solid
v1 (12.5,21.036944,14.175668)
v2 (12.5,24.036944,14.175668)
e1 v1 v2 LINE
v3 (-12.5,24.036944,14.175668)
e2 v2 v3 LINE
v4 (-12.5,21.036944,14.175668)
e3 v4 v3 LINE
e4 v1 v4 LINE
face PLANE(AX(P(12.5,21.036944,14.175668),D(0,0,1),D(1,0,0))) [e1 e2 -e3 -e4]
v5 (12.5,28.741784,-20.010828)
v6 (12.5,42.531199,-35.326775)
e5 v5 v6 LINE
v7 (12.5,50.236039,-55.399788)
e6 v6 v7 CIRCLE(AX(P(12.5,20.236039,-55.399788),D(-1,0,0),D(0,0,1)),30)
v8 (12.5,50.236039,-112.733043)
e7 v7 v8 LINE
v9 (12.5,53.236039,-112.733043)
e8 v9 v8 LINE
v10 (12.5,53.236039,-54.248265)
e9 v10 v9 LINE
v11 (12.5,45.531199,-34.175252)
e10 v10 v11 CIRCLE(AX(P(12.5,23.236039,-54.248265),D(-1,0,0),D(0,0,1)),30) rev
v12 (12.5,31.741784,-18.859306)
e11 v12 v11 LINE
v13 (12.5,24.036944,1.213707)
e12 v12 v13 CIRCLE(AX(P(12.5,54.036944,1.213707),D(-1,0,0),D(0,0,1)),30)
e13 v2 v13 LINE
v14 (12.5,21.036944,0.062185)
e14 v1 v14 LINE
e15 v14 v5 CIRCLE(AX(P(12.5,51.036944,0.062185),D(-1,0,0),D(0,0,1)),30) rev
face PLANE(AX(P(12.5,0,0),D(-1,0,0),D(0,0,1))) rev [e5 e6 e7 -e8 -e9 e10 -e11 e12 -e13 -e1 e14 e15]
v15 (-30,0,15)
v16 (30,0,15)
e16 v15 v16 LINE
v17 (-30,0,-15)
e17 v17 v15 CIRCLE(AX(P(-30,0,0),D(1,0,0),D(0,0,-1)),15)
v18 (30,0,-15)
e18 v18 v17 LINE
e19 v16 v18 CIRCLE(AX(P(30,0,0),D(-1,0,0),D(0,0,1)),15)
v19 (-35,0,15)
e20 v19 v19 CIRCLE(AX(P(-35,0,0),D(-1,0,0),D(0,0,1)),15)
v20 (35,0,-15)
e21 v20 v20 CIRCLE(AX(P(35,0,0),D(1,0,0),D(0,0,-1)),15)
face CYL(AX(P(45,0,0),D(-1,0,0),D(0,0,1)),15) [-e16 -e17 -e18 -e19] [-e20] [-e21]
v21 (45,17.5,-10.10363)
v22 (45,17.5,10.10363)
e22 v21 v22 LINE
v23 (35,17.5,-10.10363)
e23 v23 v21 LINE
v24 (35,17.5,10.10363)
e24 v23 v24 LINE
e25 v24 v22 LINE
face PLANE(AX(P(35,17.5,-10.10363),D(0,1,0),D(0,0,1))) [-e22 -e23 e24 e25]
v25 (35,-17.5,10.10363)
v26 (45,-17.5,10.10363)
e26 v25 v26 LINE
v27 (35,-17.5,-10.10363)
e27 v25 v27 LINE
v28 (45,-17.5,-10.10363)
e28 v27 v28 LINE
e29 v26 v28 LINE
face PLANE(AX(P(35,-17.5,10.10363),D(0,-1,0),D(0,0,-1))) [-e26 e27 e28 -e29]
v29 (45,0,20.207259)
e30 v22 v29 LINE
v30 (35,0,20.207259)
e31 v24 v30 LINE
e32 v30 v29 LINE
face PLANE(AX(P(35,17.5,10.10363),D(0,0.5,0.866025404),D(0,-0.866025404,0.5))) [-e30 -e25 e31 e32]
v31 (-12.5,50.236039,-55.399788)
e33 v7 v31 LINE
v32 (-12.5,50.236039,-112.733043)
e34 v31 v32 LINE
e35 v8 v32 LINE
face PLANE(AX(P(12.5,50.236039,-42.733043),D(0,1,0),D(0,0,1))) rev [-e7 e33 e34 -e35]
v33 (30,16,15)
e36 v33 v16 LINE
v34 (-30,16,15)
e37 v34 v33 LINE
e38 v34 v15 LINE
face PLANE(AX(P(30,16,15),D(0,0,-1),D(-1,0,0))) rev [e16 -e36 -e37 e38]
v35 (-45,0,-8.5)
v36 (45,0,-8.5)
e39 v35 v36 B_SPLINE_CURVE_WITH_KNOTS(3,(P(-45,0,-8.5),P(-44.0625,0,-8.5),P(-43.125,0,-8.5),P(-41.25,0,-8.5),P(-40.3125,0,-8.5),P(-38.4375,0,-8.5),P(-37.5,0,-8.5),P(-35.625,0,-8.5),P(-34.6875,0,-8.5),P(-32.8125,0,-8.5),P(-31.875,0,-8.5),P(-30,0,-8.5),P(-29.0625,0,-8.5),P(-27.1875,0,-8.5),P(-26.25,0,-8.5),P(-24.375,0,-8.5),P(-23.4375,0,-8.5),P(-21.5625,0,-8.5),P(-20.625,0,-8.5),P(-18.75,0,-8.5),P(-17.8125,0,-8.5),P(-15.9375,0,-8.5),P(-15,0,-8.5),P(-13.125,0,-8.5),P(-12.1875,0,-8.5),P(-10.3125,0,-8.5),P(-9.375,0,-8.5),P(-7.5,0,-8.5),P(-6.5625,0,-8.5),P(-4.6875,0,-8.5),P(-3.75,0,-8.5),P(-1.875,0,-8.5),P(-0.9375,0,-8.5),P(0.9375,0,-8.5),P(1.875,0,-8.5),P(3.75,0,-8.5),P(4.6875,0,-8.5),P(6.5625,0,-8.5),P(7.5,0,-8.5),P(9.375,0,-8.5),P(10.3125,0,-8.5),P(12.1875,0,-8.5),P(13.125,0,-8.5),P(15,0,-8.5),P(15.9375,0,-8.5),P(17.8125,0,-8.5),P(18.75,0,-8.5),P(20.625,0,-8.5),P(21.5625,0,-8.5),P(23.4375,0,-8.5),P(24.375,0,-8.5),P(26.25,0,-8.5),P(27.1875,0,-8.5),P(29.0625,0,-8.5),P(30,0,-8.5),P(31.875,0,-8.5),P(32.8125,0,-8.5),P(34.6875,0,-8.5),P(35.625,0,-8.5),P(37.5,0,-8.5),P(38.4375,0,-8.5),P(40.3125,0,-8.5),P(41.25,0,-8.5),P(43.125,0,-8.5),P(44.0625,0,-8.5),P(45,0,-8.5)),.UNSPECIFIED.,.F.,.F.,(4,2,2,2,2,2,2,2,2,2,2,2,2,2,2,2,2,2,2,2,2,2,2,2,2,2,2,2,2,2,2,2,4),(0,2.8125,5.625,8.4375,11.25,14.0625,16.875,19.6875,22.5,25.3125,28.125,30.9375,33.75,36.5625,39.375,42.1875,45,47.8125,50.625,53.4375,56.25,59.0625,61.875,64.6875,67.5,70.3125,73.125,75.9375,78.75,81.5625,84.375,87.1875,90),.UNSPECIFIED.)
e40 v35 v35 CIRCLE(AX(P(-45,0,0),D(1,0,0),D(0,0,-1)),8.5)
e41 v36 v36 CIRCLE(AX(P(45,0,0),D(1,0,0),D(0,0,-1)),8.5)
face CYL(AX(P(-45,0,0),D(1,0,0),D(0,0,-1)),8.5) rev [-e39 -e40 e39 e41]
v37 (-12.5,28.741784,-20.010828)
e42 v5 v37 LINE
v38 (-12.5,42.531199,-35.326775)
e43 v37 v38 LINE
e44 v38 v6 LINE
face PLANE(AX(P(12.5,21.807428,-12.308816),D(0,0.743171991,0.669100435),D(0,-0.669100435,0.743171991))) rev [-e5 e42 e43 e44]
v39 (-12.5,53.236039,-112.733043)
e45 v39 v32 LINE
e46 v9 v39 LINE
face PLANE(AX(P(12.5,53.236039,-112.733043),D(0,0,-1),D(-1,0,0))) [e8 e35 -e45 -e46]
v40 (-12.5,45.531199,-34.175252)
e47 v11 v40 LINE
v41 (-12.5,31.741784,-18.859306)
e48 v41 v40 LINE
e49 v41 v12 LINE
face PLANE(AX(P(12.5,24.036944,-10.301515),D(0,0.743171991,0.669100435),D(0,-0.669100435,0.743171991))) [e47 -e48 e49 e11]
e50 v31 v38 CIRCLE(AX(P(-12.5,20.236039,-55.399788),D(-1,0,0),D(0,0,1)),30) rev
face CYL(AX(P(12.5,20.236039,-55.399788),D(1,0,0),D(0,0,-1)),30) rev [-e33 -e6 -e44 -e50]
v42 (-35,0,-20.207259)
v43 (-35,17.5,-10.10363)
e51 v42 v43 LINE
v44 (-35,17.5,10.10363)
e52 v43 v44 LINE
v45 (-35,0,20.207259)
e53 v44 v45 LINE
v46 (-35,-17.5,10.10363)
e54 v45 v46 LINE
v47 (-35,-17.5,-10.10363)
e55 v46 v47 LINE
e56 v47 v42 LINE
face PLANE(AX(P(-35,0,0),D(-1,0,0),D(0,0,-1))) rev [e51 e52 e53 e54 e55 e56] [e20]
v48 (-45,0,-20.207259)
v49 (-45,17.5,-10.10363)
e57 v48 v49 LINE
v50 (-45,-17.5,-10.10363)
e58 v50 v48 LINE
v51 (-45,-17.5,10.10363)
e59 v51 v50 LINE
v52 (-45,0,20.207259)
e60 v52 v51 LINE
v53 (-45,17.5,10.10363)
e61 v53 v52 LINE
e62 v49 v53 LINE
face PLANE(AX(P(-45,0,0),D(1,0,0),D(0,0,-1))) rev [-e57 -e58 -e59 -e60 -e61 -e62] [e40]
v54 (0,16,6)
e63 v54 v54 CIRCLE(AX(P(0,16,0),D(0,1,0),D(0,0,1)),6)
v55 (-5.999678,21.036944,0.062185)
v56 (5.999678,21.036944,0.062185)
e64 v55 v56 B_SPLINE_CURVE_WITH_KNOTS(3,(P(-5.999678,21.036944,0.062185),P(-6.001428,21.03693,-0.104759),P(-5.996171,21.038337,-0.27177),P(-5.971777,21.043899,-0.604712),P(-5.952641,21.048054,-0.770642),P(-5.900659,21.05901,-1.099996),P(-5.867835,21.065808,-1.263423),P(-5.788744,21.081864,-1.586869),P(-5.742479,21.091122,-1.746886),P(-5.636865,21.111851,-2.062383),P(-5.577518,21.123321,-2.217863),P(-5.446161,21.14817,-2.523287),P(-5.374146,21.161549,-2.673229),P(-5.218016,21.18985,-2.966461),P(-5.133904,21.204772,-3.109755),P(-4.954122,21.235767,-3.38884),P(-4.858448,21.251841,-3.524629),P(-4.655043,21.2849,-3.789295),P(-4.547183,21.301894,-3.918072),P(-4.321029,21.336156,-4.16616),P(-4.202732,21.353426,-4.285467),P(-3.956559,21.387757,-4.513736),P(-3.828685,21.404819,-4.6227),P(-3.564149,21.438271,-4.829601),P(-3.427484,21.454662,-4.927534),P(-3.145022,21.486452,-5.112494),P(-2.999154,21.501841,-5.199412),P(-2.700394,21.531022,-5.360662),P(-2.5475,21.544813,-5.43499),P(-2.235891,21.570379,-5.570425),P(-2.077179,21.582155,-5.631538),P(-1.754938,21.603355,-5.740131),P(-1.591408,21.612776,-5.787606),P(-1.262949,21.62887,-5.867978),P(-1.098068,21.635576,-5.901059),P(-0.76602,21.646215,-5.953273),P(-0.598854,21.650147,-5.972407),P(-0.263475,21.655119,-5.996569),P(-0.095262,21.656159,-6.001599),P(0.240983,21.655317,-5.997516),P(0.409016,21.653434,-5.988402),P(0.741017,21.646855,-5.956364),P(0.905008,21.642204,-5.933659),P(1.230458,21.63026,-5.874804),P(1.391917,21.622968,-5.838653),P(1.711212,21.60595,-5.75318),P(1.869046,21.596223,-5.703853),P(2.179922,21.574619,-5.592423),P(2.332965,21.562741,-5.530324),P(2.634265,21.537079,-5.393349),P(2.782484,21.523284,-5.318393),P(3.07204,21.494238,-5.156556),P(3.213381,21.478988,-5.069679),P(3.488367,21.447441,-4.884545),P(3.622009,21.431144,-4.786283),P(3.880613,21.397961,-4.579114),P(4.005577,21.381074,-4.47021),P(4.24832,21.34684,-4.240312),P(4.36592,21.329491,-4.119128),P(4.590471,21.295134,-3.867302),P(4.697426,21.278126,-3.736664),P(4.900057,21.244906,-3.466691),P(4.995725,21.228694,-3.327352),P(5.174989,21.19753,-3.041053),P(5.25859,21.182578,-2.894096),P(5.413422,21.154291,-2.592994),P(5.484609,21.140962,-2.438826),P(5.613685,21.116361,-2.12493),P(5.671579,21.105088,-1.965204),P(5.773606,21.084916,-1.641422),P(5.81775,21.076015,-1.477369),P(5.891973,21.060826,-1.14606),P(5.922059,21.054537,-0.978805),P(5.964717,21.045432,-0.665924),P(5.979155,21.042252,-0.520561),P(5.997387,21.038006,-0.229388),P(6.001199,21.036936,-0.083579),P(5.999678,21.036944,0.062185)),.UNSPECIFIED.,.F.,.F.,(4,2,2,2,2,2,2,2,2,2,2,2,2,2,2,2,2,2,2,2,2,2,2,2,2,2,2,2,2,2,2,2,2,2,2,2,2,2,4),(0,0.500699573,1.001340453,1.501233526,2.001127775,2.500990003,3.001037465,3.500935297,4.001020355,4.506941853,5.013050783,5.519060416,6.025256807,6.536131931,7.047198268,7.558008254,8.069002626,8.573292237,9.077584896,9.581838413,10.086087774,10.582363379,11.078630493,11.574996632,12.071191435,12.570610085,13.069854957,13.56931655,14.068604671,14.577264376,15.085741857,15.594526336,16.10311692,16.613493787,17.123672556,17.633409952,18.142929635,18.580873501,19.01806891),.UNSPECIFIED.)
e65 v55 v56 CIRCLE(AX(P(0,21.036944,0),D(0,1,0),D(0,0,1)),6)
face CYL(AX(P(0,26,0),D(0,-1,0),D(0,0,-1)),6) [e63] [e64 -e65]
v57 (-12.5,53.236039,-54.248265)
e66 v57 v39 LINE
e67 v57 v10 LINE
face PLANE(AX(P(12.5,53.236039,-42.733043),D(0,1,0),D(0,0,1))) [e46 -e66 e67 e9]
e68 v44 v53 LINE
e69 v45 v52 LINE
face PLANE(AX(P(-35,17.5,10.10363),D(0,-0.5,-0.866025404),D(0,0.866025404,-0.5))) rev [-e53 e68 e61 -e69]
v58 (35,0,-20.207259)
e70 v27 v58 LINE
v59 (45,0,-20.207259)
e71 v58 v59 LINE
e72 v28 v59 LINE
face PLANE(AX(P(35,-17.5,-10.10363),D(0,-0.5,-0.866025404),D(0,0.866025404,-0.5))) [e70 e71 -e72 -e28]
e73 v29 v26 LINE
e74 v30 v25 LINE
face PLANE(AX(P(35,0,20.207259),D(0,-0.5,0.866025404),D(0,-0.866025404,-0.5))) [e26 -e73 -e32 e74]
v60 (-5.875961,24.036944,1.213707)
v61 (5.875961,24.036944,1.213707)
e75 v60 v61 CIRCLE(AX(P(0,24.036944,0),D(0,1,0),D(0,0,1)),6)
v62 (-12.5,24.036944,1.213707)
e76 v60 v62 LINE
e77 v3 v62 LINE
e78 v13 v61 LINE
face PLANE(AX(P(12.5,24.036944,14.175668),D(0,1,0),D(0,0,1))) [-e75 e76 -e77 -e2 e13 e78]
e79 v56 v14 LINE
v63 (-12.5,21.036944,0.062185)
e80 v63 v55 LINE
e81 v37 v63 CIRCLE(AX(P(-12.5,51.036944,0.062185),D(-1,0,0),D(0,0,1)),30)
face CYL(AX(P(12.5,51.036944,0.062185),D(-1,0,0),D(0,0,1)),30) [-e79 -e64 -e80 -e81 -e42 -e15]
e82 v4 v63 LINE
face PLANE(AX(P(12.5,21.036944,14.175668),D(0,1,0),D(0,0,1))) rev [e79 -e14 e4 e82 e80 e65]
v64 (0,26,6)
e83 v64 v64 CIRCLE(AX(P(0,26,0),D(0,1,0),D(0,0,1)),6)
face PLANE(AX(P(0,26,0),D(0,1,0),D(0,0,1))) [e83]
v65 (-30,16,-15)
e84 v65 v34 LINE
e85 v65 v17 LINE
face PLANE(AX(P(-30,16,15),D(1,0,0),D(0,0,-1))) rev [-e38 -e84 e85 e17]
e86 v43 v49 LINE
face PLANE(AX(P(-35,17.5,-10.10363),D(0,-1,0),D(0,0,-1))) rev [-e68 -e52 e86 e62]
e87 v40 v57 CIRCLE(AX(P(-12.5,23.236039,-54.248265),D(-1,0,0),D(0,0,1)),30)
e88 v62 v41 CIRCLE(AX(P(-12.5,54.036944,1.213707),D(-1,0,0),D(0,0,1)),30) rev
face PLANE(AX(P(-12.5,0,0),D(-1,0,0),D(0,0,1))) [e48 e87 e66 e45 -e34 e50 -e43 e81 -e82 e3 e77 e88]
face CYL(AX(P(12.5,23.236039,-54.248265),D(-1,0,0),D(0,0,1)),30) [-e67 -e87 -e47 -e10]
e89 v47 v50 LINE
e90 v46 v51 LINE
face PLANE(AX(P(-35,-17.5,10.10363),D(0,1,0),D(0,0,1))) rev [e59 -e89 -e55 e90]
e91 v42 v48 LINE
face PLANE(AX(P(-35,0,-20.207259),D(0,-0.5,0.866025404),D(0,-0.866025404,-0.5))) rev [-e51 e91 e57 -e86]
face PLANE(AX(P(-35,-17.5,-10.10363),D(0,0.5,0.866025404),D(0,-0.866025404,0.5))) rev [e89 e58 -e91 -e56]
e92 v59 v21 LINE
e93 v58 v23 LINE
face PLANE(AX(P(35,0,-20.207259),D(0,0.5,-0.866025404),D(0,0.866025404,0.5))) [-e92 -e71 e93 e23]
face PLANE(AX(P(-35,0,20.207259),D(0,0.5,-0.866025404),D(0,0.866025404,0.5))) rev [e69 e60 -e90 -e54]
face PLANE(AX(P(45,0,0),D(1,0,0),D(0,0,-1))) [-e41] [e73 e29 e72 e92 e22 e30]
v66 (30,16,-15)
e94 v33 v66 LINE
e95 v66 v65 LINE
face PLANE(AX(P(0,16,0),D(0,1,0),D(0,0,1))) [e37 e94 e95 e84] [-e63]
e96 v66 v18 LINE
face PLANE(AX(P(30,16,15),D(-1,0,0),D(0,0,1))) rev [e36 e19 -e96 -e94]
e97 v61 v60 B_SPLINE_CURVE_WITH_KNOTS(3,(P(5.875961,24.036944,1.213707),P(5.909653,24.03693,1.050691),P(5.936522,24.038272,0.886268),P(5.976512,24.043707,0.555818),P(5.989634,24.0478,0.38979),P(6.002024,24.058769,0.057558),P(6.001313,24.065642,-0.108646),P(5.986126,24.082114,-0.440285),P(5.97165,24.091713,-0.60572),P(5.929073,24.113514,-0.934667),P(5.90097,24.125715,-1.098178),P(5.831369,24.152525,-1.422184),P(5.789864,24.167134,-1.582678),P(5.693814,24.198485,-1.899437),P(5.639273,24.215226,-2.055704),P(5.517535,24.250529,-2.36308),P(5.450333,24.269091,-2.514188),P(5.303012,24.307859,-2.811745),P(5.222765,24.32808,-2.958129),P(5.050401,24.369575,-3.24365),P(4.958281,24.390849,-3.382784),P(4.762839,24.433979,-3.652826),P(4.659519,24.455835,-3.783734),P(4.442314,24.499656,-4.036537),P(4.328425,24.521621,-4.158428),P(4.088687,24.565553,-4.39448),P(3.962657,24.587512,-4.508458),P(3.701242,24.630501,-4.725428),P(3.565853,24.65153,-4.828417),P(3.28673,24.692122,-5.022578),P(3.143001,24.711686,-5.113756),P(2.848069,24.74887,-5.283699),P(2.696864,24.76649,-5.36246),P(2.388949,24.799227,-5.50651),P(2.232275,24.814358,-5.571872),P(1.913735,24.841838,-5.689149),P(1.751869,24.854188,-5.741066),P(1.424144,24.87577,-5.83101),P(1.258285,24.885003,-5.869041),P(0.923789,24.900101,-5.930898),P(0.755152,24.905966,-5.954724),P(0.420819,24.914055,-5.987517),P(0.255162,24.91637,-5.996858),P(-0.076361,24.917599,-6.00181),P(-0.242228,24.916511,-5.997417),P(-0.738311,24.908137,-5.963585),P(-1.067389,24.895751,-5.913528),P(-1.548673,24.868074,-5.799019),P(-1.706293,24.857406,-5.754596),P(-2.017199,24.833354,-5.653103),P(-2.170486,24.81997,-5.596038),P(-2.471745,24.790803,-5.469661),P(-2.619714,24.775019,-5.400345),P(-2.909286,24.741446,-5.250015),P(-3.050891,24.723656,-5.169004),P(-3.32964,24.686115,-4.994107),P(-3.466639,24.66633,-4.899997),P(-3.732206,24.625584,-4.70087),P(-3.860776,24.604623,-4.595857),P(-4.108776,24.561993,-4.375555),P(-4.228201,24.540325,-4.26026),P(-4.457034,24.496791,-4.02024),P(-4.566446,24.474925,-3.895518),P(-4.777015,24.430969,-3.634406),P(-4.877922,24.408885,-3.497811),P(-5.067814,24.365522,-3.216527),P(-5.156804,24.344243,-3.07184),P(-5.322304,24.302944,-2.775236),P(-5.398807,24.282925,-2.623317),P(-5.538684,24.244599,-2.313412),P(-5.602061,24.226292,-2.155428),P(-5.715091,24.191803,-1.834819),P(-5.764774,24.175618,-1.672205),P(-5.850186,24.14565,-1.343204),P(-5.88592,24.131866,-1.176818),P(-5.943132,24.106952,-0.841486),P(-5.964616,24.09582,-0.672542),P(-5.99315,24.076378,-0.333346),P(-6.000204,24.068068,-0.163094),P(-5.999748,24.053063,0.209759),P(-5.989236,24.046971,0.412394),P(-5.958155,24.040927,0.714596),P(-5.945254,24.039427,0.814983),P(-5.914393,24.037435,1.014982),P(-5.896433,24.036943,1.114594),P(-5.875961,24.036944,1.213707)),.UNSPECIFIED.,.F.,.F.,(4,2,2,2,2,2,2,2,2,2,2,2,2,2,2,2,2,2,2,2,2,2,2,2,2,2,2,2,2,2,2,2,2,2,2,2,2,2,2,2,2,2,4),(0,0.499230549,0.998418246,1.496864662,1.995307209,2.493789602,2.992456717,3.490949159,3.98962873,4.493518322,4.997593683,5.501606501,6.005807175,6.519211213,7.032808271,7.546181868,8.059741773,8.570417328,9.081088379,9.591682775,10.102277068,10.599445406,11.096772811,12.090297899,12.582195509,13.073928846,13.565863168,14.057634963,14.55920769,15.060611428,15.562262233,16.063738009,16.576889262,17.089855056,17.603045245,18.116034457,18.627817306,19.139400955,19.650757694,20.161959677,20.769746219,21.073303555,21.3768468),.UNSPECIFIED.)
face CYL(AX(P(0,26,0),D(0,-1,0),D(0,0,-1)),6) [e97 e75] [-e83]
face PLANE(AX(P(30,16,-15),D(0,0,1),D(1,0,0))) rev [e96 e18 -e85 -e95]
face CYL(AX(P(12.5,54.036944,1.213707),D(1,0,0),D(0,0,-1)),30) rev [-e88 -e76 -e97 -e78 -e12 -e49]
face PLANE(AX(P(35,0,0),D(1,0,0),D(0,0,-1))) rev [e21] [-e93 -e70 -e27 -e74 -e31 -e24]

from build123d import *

# Parameters (mm, degrees)
SKETCH1_R               = 15
SKETCH1_R_2             = 5
EXTRUDE_THIN1_DEPTH     = 45
SKETCH2_W               = 60
SKETCH2_H               = 30
BOSS_EXTRUDE1_DEPTH     = 16
SKETCH3_R               = 6
BOSS_EXTRUDE2_DEPTH     = 10
EXTRUDE_THIN2_DEPTH     = 12.5
FILLET1_R               = 30
BOSS_EXTRUDE3_DEPTH     = 10
CUT_EXTRUDE1_DEPTH      = 133.543633763
CUT_EXTRUDE1_DEPTH_BACK = 133.543633763
SKETCH6_R               = 8.5


with BuildPart() as part:
    # Sketch1 → Extrude-Thin1 (new, symmetric)
    with BuildSketch(Plane(origin=(0, 0, 0), x_dir=(0, 0, -1), z_dir=(1, 0, 0))):
        Circle(SKETCH1_R)
        Circle(SKETCH1_R_2, mode=Mode.SUBTRACT)
    extrude(amount=EXTRUDE_THIN1_DEPTH, both=True)

    # Sketch2 → Boss-Extrude1 (add)
    with BuildSketch(Plane(origin=(0, 0, 0), x_dir=(1, 0, 0), z_dir=(0, 1, 0))):
        Rectangle(SKETCH2_W, SKETCH2_H)
    extrude(amount=BOSS_EXTRUDE1_DEPTH)

    # Sketch3 → Boss-Extrude2 (add)
    with BuildSketch(Plane(origin=(0, 16, 0), x_dir=(1, 0, 0), z_dir=(0, 1, 0))):
        with Locations(Location((0, 0, 0), (0, 0, 270))):
            Circle(SKETCH3_R)
    extrude(amount=BOSS_EXTRUDE2_DEPTH)

    # Sketch4 → Extrude-Thin2 (add, symmetric)
    with BuildSketch(Plane(origin=(0, 0, 0), x_dir=(0, 0, -1), z_dir=(1, 0, 0))):
        Polygon((-14.175668382, 24.036944014), (10.301514998, 24.036944014), (42.733043078, 53.23603901), (112.733043078, 53.23603901), (112.733043078, 50.23603901), (43.884565313, 50.23603901), (11.453037232, 21.036944014), (-14.175668382, 21.036944014), align=None)
    extrude(amount=EXTRUDE_THIN2_DEPTH, both=True)

    # Fillet1
    # the kernel refuses this fillet: 30 mm, written as the material it adds along each edge
    with BuildSketch(Plane(origin=(12.5, 50.23603901, -43.884565313), x_dir=(0, -0.6691004351822666, 0.7431719906178524), z_dir=(-1, 0, 0))) as fillet1_piece_1:
        with BuildLine():
            CenterArc((FILLET1_R * 0.383840744794, -FILLET1_R), FILLET1_R, 90, 41.997673873)
            Line((-FILLET1_R * 0.285259690389, -FILLET1_R * 0.256828009382), (0, 0))
            Line((0, 0), (FILLET1_R * 0.383840744794, 0))
        make_face()
    extrude(amount=25)
    with BuildSketch(Plane(origin=(12.5, 24.036944014, -10.301514998), x_dir=(0, 0, 1), z_dir=(-1, 0, 0))) as fillet1_piece_2:
        with BuildLine():
            CenterArc((FILLET1_R * 0.383840744794, FILLET1_R), FILLET1_R, 228.002326127, 41.997673873)
            Line((-FILLET1_R * 0.285259690389, FILLET1_R * 0.256828009382), (0, 0))
            Line((0, 0), (FILLET1_R * 0.383840744794, 0))
        make_face()
    extrude(amount=25)
    # the kernel refuses this fillet: 30 mm, written as the material it takes off along each edge
    with BuildSketch(Plane(origin=(41.28805586, 53.23603901, -42.733043078), x_dir=(0, -0.6691004351822663, 0.7431719906178528), z_dir=(-1, 0, 0))) as fillet1_2_piece_1:
        with BuildLine():
            CenterArc((FILLET1_R * 0.383840744794, -FILLET1_R), FILLET1_R, 90, 41.997673873)
            Line((-FILLET1_R * 0.285259690389, -FILLET1_R * 0.256828009382), (0, 0))
            Line((0, 0), (FILLET1_R * 0.383840744794, 0))
        make_face()
    extrude(amount=82.576111719, mode=Mode.SUBTRACT)
    with BuildSketch(Plane(origin=(-41.28805586, 21.036944014, -11.453037232), x_dir=(0, 0, 1), z_dir=(1, 0, 0))) as fillet1_2_piece_2_section:
        with BuildLine():
            CenterArc((FILLET1_R * 0.383840744794, -FILLET1_R), FILLET1_R, 90, 41.997673873)
            Line((-FILLET1_R * 0.285259690389, -FILLET1_R * 0.256828009382), (0, 0))
            Line((0, 0), (FILLET1_R * 0.383840744794, 0))
        make_face()
    fillet1_2_piece_2 = extrude(amount=82.576111719, mode=Mode.PRIVATE)
    fillet1_2_piece_2 = fillet1_2_piece_2 - Plane(origin=(0, 22.678661346, 0), x_dir=(0, 0, 1), z_dir=(0, -1, 0)) * Cylinder(6, 212, mode=Mode.PRIVATE)
    add(fillet1_2_piece_2, mode=Mode.SUBTRACT)

    # Sketch5 → Boss-Extrude3 (add)
    with BuildSketch(Plane(origin=(45, 0, 0), x_dir=(0, 0, -1), z_dir=(1, 0, 0))):
        Polygon((-20.207259422, 0), (-10.103629711, -17.5), (10.103629711, -17.5), (20.207259422, 0), (10.103629711, 17.5), (-10.103629711, 17.5), align=None)
    boss_extrude3 = extrude(amount=-BOSS_EXTRUDE3_DEPTH)

    # Mirror1: Boss-Extrude3 across plane
    add(boss_extrude3.mirror(Plane(origin=(0, 0, 0), x_dir=(0, 0, 1), z_dir=(1, 0, 0))))

    # Sketch6 → Cut-Extrude1 (cut, two sides: drawn at the far end of the back side and taken through both)
    with BuildSketch(Plane(origin=(0, 0, 0), x_dir=(0, 0, -1), z_dir=(1, 0, 0)).offset(-CUT_EXTRUDE1_DEPTH_BACK)):
        Circle(SKETCH6_R)
    extrude(amount=CUT_EXTRUDE1_DEPTH + CUT_EXTRUDE1_DEPTH_BACK, mode=Mode.SUBTRACT)


solid = part.part
